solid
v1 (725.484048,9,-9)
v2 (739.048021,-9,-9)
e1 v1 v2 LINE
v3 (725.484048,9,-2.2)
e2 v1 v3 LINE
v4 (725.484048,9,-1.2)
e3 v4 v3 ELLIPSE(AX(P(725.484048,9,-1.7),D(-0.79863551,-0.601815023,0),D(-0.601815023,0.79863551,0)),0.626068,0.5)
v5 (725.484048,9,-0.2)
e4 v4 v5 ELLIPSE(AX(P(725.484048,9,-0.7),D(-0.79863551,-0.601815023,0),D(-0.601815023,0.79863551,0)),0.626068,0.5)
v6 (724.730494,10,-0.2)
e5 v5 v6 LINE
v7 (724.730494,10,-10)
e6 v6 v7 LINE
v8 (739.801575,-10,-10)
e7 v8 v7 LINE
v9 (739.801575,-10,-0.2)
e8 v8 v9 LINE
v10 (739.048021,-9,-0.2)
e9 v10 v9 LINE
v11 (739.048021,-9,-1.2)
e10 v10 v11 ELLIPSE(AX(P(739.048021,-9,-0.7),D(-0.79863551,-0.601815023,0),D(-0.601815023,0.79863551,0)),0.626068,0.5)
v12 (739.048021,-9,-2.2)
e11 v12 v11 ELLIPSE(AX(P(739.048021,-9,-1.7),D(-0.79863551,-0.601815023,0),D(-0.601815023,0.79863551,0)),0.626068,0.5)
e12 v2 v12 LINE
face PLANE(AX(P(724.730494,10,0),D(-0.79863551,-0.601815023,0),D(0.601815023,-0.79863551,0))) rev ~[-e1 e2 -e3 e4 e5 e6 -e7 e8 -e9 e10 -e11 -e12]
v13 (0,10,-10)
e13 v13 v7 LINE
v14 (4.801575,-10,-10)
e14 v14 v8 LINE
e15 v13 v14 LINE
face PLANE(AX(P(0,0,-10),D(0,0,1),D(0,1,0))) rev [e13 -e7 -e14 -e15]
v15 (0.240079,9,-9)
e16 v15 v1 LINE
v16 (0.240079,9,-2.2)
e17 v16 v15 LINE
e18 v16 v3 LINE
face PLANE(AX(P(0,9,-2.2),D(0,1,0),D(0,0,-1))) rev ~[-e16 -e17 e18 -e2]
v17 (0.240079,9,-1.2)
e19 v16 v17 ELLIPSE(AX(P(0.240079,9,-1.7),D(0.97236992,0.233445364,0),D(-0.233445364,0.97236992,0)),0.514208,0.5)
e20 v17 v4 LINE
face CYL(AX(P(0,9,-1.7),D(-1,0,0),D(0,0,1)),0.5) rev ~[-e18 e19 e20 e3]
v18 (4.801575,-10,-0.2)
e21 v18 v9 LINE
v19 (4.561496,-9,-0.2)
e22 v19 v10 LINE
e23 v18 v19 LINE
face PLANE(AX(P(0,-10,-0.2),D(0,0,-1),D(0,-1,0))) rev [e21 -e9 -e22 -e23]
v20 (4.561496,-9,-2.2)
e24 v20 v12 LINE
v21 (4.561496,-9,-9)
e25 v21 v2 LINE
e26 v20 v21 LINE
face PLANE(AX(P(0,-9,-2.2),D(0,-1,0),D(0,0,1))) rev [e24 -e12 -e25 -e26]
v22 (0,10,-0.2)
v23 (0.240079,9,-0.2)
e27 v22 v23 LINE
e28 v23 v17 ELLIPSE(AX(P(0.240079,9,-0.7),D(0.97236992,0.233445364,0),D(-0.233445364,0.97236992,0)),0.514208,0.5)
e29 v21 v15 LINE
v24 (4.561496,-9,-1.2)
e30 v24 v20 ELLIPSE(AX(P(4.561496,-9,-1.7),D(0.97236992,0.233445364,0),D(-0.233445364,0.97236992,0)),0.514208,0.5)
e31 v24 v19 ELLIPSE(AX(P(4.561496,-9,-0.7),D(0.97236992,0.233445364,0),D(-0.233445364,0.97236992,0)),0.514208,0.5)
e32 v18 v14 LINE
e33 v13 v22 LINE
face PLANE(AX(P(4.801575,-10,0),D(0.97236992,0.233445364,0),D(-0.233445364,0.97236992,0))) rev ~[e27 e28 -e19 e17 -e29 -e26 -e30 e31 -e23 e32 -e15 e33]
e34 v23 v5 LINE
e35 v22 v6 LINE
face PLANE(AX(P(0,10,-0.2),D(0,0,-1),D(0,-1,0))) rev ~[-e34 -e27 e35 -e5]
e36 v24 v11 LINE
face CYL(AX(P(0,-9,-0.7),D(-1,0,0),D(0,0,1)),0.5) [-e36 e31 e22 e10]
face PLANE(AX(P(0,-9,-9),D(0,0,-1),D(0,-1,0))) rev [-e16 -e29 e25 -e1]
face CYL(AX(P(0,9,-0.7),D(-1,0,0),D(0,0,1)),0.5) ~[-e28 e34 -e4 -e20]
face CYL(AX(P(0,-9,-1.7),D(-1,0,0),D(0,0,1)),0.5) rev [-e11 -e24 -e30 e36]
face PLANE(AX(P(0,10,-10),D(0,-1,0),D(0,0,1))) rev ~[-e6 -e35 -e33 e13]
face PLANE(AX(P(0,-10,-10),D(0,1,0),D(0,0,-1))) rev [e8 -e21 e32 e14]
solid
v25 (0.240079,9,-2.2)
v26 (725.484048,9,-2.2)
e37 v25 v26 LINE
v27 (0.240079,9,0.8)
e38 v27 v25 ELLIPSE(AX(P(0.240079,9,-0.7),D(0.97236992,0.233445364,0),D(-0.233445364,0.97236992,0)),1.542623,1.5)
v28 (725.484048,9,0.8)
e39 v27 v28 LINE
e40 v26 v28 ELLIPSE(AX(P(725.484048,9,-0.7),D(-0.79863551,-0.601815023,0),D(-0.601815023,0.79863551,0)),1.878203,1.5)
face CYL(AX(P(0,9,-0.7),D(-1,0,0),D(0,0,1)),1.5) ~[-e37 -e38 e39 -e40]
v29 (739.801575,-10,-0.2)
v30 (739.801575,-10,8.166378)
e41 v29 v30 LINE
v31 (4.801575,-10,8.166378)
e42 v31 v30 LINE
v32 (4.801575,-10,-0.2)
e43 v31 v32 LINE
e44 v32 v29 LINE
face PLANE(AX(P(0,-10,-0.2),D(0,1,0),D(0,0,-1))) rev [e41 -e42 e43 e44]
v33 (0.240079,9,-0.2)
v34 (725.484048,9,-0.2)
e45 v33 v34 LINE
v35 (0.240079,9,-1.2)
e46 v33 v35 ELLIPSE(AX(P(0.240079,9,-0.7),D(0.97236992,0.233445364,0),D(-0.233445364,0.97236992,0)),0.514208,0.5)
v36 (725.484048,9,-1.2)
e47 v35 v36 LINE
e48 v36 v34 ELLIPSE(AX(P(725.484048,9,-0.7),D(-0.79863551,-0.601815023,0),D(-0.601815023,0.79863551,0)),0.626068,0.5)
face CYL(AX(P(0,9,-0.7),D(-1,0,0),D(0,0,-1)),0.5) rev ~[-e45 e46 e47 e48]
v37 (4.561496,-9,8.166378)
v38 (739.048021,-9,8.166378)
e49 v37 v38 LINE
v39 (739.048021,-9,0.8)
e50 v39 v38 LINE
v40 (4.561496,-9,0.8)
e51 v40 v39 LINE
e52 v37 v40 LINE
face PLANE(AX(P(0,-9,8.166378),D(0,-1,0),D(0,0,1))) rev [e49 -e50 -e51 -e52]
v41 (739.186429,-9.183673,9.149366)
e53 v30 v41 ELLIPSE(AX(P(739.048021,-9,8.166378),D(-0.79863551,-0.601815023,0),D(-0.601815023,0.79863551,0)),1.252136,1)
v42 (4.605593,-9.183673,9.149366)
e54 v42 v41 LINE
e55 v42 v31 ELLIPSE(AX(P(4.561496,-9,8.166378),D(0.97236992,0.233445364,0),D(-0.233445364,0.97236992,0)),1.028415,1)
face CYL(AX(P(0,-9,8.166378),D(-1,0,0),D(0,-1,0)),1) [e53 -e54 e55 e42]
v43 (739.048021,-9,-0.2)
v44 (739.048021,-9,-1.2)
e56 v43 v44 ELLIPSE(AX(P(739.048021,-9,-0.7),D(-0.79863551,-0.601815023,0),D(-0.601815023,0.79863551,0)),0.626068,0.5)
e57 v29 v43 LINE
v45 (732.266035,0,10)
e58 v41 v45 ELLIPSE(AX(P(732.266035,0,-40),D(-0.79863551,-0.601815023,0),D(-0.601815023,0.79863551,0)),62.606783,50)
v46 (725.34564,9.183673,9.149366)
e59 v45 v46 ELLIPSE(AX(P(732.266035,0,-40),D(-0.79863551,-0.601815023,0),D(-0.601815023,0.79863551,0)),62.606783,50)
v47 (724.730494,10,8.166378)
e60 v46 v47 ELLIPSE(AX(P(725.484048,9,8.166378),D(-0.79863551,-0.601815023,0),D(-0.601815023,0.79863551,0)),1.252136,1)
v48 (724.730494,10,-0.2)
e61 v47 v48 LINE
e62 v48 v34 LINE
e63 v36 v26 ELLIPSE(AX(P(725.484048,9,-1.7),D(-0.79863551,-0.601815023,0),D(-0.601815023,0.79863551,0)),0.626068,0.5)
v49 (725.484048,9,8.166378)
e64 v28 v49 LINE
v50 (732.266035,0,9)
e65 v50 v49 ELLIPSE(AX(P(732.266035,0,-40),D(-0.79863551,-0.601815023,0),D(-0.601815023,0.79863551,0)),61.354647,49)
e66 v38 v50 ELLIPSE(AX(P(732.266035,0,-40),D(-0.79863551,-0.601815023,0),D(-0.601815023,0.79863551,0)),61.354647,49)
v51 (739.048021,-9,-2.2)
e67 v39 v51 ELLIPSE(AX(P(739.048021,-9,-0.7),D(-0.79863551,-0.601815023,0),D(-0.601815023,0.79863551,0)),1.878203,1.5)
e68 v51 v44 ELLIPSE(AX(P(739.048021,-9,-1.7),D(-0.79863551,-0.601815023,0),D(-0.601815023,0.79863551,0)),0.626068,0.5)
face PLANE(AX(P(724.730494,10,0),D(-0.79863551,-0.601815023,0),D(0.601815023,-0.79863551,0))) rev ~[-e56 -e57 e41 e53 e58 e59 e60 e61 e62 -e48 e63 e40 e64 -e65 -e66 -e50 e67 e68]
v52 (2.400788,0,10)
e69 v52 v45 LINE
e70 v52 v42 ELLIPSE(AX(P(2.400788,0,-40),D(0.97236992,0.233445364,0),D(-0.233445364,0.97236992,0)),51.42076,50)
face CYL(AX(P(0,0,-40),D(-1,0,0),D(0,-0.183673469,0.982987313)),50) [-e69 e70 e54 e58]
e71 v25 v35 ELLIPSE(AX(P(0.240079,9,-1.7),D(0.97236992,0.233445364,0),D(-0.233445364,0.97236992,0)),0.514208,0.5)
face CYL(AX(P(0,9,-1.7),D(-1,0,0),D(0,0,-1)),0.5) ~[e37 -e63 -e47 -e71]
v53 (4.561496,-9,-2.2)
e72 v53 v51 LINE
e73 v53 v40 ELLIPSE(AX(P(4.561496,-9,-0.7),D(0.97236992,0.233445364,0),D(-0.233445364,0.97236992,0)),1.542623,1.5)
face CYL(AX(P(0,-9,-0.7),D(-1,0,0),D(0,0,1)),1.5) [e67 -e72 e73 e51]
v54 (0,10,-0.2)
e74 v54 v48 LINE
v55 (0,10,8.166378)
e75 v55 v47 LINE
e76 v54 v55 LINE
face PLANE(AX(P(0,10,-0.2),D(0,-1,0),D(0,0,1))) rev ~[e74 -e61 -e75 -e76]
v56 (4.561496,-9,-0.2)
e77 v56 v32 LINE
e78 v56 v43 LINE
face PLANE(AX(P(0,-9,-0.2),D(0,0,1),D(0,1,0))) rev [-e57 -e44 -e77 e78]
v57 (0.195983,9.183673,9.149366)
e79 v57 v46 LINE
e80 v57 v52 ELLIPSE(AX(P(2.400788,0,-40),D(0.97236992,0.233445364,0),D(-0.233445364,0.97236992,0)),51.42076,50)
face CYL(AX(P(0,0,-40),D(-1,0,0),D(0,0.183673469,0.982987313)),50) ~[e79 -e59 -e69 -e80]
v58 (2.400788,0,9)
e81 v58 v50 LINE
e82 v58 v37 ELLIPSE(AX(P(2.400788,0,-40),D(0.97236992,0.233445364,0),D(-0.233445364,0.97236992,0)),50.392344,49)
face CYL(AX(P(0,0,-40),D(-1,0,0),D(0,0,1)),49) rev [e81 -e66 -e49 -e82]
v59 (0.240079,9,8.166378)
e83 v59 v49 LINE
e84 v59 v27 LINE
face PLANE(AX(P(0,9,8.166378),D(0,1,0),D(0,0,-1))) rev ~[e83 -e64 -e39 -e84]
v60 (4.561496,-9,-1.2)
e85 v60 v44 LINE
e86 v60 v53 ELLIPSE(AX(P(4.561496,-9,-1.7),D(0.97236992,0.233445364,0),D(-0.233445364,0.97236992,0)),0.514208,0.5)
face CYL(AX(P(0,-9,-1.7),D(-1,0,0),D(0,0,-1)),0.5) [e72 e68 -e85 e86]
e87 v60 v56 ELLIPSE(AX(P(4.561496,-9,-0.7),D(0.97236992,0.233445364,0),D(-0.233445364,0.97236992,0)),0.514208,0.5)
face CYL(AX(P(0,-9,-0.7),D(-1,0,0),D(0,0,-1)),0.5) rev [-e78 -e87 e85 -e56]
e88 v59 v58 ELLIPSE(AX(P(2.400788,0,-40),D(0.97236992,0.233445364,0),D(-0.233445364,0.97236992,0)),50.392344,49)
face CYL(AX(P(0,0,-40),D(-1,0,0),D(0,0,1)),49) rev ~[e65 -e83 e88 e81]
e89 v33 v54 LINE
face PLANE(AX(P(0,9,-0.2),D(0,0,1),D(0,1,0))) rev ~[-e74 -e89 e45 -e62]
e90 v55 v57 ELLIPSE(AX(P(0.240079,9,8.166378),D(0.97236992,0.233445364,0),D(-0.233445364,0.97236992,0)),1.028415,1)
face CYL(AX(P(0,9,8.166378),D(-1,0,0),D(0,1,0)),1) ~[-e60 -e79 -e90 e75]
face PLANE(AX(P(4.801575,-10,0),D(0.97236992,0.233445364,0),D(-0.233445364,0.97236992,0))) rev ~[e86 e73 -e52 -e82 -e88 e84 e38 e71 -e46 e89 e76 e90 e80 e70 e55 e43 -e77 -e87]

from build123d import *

# Parameters (mm, degrees)
F2_DEPTH      = 1000
F4_DEPTH      = 1000
F8_DEPTH      = 10.001
F8_DEPTH_BACK = 10.001


with BuildPart() as f2:
    # F1 (on Right) → F2 (new body)
    with BuildSketch(Plane.YZ):
        with BuildLine():
            Line((0, -9), (0, -10))
            Line((0, -10), (10, -10))
            Line((10, -10), (10, -0.2))
            Line((10, -0.2), (9, -0.2))
            ThreePointArc((9, -0.2), (8.5, -0.7), (9, -1.2))
            ThreePointArc((9, -1.2), (9.5, -1.7), (9, -2.2))
            Line((9, -2.2), (9, -9))
            Line((9, -9), (0, -9))
        make_face()
    extrude(amount=F2_DEPTH)

    # F5: F2 across plane


with BuildPart() as f4:
    # F3 (on Right) → F4 (new body)
    with BuildSketch(Plane.YZ):
        with BuildLine():
            Line((9, -0.2), (10, -0.2))
            Line((10, -0.2), (10, 8.1663783152))
            ThreePointArc((10, 8.1663783152), (9.7693092582, 8.8052548802), (9.1836734694, 9.1493656277))
            ThreePointArc((9.1836734694, 9.1493656277), (4.6114920912, 9.7868872364), (0, 10))
            Line((0, 10), (0, 9))
            ThreePointArc((0, 9), (4.5192622493, 8.7911494917), (9, 8.1663783152))
            Line((9, 8.1663783152), (9, 0.8))
            ThreePointArc((9, 0.8), (7.5, -0.7), (9, -2.2))
            ThreePointArc((9, -2.2), (9.5, -1.7), (9, -1.2))
            ThreePointArc((9, -1.2), (8.5, -0.7), (9, -0.2))
        make_face()
    extrude(amount=F4_DEPTH)

    # F6: F4 across plane


with BuildPart() as f2_1:
    add(f2.part)
    add(f2.part.mirror(Plane.XZ))


with BuildPart() as f4_1:
    add(f4.part)
    add(f4.part.mirror(Plane.XZ))


with BuildPart() as f8_tool:
    # F7 (on Top) → F8 (new body, two sides)
    with BuildSketch(Plane.XY) as f8_sk:
        Polygon((0, 10), (0, 0), (0, -10), (4.8015751816, -10), align=None)
        Polygon((739.8015751816, 10), (724.7304941795, 10), (739.8015751816, -10), (1016.9613361359, -10), (1016.9613361359, 10), align=None)
    extrude(amount=F8_DEPTH)
    extrude(f8_sk.sketch, amount=-F8_DEPTH_BACK)


with BuildPart() as f2_2:
    add(f2_1.part)

    # F8: cut by f8_tool
    add(f8_tool.part, mode=Mode.SUBTRACT)


with BuildPart() as f4_2:
    add(f4_1.part)

    # F8: cut by f8_tool
    add(f8_tool.part, mode=Mode.SUBTRACT)


solid = Compound([f2_2.part, f4_2.part])
